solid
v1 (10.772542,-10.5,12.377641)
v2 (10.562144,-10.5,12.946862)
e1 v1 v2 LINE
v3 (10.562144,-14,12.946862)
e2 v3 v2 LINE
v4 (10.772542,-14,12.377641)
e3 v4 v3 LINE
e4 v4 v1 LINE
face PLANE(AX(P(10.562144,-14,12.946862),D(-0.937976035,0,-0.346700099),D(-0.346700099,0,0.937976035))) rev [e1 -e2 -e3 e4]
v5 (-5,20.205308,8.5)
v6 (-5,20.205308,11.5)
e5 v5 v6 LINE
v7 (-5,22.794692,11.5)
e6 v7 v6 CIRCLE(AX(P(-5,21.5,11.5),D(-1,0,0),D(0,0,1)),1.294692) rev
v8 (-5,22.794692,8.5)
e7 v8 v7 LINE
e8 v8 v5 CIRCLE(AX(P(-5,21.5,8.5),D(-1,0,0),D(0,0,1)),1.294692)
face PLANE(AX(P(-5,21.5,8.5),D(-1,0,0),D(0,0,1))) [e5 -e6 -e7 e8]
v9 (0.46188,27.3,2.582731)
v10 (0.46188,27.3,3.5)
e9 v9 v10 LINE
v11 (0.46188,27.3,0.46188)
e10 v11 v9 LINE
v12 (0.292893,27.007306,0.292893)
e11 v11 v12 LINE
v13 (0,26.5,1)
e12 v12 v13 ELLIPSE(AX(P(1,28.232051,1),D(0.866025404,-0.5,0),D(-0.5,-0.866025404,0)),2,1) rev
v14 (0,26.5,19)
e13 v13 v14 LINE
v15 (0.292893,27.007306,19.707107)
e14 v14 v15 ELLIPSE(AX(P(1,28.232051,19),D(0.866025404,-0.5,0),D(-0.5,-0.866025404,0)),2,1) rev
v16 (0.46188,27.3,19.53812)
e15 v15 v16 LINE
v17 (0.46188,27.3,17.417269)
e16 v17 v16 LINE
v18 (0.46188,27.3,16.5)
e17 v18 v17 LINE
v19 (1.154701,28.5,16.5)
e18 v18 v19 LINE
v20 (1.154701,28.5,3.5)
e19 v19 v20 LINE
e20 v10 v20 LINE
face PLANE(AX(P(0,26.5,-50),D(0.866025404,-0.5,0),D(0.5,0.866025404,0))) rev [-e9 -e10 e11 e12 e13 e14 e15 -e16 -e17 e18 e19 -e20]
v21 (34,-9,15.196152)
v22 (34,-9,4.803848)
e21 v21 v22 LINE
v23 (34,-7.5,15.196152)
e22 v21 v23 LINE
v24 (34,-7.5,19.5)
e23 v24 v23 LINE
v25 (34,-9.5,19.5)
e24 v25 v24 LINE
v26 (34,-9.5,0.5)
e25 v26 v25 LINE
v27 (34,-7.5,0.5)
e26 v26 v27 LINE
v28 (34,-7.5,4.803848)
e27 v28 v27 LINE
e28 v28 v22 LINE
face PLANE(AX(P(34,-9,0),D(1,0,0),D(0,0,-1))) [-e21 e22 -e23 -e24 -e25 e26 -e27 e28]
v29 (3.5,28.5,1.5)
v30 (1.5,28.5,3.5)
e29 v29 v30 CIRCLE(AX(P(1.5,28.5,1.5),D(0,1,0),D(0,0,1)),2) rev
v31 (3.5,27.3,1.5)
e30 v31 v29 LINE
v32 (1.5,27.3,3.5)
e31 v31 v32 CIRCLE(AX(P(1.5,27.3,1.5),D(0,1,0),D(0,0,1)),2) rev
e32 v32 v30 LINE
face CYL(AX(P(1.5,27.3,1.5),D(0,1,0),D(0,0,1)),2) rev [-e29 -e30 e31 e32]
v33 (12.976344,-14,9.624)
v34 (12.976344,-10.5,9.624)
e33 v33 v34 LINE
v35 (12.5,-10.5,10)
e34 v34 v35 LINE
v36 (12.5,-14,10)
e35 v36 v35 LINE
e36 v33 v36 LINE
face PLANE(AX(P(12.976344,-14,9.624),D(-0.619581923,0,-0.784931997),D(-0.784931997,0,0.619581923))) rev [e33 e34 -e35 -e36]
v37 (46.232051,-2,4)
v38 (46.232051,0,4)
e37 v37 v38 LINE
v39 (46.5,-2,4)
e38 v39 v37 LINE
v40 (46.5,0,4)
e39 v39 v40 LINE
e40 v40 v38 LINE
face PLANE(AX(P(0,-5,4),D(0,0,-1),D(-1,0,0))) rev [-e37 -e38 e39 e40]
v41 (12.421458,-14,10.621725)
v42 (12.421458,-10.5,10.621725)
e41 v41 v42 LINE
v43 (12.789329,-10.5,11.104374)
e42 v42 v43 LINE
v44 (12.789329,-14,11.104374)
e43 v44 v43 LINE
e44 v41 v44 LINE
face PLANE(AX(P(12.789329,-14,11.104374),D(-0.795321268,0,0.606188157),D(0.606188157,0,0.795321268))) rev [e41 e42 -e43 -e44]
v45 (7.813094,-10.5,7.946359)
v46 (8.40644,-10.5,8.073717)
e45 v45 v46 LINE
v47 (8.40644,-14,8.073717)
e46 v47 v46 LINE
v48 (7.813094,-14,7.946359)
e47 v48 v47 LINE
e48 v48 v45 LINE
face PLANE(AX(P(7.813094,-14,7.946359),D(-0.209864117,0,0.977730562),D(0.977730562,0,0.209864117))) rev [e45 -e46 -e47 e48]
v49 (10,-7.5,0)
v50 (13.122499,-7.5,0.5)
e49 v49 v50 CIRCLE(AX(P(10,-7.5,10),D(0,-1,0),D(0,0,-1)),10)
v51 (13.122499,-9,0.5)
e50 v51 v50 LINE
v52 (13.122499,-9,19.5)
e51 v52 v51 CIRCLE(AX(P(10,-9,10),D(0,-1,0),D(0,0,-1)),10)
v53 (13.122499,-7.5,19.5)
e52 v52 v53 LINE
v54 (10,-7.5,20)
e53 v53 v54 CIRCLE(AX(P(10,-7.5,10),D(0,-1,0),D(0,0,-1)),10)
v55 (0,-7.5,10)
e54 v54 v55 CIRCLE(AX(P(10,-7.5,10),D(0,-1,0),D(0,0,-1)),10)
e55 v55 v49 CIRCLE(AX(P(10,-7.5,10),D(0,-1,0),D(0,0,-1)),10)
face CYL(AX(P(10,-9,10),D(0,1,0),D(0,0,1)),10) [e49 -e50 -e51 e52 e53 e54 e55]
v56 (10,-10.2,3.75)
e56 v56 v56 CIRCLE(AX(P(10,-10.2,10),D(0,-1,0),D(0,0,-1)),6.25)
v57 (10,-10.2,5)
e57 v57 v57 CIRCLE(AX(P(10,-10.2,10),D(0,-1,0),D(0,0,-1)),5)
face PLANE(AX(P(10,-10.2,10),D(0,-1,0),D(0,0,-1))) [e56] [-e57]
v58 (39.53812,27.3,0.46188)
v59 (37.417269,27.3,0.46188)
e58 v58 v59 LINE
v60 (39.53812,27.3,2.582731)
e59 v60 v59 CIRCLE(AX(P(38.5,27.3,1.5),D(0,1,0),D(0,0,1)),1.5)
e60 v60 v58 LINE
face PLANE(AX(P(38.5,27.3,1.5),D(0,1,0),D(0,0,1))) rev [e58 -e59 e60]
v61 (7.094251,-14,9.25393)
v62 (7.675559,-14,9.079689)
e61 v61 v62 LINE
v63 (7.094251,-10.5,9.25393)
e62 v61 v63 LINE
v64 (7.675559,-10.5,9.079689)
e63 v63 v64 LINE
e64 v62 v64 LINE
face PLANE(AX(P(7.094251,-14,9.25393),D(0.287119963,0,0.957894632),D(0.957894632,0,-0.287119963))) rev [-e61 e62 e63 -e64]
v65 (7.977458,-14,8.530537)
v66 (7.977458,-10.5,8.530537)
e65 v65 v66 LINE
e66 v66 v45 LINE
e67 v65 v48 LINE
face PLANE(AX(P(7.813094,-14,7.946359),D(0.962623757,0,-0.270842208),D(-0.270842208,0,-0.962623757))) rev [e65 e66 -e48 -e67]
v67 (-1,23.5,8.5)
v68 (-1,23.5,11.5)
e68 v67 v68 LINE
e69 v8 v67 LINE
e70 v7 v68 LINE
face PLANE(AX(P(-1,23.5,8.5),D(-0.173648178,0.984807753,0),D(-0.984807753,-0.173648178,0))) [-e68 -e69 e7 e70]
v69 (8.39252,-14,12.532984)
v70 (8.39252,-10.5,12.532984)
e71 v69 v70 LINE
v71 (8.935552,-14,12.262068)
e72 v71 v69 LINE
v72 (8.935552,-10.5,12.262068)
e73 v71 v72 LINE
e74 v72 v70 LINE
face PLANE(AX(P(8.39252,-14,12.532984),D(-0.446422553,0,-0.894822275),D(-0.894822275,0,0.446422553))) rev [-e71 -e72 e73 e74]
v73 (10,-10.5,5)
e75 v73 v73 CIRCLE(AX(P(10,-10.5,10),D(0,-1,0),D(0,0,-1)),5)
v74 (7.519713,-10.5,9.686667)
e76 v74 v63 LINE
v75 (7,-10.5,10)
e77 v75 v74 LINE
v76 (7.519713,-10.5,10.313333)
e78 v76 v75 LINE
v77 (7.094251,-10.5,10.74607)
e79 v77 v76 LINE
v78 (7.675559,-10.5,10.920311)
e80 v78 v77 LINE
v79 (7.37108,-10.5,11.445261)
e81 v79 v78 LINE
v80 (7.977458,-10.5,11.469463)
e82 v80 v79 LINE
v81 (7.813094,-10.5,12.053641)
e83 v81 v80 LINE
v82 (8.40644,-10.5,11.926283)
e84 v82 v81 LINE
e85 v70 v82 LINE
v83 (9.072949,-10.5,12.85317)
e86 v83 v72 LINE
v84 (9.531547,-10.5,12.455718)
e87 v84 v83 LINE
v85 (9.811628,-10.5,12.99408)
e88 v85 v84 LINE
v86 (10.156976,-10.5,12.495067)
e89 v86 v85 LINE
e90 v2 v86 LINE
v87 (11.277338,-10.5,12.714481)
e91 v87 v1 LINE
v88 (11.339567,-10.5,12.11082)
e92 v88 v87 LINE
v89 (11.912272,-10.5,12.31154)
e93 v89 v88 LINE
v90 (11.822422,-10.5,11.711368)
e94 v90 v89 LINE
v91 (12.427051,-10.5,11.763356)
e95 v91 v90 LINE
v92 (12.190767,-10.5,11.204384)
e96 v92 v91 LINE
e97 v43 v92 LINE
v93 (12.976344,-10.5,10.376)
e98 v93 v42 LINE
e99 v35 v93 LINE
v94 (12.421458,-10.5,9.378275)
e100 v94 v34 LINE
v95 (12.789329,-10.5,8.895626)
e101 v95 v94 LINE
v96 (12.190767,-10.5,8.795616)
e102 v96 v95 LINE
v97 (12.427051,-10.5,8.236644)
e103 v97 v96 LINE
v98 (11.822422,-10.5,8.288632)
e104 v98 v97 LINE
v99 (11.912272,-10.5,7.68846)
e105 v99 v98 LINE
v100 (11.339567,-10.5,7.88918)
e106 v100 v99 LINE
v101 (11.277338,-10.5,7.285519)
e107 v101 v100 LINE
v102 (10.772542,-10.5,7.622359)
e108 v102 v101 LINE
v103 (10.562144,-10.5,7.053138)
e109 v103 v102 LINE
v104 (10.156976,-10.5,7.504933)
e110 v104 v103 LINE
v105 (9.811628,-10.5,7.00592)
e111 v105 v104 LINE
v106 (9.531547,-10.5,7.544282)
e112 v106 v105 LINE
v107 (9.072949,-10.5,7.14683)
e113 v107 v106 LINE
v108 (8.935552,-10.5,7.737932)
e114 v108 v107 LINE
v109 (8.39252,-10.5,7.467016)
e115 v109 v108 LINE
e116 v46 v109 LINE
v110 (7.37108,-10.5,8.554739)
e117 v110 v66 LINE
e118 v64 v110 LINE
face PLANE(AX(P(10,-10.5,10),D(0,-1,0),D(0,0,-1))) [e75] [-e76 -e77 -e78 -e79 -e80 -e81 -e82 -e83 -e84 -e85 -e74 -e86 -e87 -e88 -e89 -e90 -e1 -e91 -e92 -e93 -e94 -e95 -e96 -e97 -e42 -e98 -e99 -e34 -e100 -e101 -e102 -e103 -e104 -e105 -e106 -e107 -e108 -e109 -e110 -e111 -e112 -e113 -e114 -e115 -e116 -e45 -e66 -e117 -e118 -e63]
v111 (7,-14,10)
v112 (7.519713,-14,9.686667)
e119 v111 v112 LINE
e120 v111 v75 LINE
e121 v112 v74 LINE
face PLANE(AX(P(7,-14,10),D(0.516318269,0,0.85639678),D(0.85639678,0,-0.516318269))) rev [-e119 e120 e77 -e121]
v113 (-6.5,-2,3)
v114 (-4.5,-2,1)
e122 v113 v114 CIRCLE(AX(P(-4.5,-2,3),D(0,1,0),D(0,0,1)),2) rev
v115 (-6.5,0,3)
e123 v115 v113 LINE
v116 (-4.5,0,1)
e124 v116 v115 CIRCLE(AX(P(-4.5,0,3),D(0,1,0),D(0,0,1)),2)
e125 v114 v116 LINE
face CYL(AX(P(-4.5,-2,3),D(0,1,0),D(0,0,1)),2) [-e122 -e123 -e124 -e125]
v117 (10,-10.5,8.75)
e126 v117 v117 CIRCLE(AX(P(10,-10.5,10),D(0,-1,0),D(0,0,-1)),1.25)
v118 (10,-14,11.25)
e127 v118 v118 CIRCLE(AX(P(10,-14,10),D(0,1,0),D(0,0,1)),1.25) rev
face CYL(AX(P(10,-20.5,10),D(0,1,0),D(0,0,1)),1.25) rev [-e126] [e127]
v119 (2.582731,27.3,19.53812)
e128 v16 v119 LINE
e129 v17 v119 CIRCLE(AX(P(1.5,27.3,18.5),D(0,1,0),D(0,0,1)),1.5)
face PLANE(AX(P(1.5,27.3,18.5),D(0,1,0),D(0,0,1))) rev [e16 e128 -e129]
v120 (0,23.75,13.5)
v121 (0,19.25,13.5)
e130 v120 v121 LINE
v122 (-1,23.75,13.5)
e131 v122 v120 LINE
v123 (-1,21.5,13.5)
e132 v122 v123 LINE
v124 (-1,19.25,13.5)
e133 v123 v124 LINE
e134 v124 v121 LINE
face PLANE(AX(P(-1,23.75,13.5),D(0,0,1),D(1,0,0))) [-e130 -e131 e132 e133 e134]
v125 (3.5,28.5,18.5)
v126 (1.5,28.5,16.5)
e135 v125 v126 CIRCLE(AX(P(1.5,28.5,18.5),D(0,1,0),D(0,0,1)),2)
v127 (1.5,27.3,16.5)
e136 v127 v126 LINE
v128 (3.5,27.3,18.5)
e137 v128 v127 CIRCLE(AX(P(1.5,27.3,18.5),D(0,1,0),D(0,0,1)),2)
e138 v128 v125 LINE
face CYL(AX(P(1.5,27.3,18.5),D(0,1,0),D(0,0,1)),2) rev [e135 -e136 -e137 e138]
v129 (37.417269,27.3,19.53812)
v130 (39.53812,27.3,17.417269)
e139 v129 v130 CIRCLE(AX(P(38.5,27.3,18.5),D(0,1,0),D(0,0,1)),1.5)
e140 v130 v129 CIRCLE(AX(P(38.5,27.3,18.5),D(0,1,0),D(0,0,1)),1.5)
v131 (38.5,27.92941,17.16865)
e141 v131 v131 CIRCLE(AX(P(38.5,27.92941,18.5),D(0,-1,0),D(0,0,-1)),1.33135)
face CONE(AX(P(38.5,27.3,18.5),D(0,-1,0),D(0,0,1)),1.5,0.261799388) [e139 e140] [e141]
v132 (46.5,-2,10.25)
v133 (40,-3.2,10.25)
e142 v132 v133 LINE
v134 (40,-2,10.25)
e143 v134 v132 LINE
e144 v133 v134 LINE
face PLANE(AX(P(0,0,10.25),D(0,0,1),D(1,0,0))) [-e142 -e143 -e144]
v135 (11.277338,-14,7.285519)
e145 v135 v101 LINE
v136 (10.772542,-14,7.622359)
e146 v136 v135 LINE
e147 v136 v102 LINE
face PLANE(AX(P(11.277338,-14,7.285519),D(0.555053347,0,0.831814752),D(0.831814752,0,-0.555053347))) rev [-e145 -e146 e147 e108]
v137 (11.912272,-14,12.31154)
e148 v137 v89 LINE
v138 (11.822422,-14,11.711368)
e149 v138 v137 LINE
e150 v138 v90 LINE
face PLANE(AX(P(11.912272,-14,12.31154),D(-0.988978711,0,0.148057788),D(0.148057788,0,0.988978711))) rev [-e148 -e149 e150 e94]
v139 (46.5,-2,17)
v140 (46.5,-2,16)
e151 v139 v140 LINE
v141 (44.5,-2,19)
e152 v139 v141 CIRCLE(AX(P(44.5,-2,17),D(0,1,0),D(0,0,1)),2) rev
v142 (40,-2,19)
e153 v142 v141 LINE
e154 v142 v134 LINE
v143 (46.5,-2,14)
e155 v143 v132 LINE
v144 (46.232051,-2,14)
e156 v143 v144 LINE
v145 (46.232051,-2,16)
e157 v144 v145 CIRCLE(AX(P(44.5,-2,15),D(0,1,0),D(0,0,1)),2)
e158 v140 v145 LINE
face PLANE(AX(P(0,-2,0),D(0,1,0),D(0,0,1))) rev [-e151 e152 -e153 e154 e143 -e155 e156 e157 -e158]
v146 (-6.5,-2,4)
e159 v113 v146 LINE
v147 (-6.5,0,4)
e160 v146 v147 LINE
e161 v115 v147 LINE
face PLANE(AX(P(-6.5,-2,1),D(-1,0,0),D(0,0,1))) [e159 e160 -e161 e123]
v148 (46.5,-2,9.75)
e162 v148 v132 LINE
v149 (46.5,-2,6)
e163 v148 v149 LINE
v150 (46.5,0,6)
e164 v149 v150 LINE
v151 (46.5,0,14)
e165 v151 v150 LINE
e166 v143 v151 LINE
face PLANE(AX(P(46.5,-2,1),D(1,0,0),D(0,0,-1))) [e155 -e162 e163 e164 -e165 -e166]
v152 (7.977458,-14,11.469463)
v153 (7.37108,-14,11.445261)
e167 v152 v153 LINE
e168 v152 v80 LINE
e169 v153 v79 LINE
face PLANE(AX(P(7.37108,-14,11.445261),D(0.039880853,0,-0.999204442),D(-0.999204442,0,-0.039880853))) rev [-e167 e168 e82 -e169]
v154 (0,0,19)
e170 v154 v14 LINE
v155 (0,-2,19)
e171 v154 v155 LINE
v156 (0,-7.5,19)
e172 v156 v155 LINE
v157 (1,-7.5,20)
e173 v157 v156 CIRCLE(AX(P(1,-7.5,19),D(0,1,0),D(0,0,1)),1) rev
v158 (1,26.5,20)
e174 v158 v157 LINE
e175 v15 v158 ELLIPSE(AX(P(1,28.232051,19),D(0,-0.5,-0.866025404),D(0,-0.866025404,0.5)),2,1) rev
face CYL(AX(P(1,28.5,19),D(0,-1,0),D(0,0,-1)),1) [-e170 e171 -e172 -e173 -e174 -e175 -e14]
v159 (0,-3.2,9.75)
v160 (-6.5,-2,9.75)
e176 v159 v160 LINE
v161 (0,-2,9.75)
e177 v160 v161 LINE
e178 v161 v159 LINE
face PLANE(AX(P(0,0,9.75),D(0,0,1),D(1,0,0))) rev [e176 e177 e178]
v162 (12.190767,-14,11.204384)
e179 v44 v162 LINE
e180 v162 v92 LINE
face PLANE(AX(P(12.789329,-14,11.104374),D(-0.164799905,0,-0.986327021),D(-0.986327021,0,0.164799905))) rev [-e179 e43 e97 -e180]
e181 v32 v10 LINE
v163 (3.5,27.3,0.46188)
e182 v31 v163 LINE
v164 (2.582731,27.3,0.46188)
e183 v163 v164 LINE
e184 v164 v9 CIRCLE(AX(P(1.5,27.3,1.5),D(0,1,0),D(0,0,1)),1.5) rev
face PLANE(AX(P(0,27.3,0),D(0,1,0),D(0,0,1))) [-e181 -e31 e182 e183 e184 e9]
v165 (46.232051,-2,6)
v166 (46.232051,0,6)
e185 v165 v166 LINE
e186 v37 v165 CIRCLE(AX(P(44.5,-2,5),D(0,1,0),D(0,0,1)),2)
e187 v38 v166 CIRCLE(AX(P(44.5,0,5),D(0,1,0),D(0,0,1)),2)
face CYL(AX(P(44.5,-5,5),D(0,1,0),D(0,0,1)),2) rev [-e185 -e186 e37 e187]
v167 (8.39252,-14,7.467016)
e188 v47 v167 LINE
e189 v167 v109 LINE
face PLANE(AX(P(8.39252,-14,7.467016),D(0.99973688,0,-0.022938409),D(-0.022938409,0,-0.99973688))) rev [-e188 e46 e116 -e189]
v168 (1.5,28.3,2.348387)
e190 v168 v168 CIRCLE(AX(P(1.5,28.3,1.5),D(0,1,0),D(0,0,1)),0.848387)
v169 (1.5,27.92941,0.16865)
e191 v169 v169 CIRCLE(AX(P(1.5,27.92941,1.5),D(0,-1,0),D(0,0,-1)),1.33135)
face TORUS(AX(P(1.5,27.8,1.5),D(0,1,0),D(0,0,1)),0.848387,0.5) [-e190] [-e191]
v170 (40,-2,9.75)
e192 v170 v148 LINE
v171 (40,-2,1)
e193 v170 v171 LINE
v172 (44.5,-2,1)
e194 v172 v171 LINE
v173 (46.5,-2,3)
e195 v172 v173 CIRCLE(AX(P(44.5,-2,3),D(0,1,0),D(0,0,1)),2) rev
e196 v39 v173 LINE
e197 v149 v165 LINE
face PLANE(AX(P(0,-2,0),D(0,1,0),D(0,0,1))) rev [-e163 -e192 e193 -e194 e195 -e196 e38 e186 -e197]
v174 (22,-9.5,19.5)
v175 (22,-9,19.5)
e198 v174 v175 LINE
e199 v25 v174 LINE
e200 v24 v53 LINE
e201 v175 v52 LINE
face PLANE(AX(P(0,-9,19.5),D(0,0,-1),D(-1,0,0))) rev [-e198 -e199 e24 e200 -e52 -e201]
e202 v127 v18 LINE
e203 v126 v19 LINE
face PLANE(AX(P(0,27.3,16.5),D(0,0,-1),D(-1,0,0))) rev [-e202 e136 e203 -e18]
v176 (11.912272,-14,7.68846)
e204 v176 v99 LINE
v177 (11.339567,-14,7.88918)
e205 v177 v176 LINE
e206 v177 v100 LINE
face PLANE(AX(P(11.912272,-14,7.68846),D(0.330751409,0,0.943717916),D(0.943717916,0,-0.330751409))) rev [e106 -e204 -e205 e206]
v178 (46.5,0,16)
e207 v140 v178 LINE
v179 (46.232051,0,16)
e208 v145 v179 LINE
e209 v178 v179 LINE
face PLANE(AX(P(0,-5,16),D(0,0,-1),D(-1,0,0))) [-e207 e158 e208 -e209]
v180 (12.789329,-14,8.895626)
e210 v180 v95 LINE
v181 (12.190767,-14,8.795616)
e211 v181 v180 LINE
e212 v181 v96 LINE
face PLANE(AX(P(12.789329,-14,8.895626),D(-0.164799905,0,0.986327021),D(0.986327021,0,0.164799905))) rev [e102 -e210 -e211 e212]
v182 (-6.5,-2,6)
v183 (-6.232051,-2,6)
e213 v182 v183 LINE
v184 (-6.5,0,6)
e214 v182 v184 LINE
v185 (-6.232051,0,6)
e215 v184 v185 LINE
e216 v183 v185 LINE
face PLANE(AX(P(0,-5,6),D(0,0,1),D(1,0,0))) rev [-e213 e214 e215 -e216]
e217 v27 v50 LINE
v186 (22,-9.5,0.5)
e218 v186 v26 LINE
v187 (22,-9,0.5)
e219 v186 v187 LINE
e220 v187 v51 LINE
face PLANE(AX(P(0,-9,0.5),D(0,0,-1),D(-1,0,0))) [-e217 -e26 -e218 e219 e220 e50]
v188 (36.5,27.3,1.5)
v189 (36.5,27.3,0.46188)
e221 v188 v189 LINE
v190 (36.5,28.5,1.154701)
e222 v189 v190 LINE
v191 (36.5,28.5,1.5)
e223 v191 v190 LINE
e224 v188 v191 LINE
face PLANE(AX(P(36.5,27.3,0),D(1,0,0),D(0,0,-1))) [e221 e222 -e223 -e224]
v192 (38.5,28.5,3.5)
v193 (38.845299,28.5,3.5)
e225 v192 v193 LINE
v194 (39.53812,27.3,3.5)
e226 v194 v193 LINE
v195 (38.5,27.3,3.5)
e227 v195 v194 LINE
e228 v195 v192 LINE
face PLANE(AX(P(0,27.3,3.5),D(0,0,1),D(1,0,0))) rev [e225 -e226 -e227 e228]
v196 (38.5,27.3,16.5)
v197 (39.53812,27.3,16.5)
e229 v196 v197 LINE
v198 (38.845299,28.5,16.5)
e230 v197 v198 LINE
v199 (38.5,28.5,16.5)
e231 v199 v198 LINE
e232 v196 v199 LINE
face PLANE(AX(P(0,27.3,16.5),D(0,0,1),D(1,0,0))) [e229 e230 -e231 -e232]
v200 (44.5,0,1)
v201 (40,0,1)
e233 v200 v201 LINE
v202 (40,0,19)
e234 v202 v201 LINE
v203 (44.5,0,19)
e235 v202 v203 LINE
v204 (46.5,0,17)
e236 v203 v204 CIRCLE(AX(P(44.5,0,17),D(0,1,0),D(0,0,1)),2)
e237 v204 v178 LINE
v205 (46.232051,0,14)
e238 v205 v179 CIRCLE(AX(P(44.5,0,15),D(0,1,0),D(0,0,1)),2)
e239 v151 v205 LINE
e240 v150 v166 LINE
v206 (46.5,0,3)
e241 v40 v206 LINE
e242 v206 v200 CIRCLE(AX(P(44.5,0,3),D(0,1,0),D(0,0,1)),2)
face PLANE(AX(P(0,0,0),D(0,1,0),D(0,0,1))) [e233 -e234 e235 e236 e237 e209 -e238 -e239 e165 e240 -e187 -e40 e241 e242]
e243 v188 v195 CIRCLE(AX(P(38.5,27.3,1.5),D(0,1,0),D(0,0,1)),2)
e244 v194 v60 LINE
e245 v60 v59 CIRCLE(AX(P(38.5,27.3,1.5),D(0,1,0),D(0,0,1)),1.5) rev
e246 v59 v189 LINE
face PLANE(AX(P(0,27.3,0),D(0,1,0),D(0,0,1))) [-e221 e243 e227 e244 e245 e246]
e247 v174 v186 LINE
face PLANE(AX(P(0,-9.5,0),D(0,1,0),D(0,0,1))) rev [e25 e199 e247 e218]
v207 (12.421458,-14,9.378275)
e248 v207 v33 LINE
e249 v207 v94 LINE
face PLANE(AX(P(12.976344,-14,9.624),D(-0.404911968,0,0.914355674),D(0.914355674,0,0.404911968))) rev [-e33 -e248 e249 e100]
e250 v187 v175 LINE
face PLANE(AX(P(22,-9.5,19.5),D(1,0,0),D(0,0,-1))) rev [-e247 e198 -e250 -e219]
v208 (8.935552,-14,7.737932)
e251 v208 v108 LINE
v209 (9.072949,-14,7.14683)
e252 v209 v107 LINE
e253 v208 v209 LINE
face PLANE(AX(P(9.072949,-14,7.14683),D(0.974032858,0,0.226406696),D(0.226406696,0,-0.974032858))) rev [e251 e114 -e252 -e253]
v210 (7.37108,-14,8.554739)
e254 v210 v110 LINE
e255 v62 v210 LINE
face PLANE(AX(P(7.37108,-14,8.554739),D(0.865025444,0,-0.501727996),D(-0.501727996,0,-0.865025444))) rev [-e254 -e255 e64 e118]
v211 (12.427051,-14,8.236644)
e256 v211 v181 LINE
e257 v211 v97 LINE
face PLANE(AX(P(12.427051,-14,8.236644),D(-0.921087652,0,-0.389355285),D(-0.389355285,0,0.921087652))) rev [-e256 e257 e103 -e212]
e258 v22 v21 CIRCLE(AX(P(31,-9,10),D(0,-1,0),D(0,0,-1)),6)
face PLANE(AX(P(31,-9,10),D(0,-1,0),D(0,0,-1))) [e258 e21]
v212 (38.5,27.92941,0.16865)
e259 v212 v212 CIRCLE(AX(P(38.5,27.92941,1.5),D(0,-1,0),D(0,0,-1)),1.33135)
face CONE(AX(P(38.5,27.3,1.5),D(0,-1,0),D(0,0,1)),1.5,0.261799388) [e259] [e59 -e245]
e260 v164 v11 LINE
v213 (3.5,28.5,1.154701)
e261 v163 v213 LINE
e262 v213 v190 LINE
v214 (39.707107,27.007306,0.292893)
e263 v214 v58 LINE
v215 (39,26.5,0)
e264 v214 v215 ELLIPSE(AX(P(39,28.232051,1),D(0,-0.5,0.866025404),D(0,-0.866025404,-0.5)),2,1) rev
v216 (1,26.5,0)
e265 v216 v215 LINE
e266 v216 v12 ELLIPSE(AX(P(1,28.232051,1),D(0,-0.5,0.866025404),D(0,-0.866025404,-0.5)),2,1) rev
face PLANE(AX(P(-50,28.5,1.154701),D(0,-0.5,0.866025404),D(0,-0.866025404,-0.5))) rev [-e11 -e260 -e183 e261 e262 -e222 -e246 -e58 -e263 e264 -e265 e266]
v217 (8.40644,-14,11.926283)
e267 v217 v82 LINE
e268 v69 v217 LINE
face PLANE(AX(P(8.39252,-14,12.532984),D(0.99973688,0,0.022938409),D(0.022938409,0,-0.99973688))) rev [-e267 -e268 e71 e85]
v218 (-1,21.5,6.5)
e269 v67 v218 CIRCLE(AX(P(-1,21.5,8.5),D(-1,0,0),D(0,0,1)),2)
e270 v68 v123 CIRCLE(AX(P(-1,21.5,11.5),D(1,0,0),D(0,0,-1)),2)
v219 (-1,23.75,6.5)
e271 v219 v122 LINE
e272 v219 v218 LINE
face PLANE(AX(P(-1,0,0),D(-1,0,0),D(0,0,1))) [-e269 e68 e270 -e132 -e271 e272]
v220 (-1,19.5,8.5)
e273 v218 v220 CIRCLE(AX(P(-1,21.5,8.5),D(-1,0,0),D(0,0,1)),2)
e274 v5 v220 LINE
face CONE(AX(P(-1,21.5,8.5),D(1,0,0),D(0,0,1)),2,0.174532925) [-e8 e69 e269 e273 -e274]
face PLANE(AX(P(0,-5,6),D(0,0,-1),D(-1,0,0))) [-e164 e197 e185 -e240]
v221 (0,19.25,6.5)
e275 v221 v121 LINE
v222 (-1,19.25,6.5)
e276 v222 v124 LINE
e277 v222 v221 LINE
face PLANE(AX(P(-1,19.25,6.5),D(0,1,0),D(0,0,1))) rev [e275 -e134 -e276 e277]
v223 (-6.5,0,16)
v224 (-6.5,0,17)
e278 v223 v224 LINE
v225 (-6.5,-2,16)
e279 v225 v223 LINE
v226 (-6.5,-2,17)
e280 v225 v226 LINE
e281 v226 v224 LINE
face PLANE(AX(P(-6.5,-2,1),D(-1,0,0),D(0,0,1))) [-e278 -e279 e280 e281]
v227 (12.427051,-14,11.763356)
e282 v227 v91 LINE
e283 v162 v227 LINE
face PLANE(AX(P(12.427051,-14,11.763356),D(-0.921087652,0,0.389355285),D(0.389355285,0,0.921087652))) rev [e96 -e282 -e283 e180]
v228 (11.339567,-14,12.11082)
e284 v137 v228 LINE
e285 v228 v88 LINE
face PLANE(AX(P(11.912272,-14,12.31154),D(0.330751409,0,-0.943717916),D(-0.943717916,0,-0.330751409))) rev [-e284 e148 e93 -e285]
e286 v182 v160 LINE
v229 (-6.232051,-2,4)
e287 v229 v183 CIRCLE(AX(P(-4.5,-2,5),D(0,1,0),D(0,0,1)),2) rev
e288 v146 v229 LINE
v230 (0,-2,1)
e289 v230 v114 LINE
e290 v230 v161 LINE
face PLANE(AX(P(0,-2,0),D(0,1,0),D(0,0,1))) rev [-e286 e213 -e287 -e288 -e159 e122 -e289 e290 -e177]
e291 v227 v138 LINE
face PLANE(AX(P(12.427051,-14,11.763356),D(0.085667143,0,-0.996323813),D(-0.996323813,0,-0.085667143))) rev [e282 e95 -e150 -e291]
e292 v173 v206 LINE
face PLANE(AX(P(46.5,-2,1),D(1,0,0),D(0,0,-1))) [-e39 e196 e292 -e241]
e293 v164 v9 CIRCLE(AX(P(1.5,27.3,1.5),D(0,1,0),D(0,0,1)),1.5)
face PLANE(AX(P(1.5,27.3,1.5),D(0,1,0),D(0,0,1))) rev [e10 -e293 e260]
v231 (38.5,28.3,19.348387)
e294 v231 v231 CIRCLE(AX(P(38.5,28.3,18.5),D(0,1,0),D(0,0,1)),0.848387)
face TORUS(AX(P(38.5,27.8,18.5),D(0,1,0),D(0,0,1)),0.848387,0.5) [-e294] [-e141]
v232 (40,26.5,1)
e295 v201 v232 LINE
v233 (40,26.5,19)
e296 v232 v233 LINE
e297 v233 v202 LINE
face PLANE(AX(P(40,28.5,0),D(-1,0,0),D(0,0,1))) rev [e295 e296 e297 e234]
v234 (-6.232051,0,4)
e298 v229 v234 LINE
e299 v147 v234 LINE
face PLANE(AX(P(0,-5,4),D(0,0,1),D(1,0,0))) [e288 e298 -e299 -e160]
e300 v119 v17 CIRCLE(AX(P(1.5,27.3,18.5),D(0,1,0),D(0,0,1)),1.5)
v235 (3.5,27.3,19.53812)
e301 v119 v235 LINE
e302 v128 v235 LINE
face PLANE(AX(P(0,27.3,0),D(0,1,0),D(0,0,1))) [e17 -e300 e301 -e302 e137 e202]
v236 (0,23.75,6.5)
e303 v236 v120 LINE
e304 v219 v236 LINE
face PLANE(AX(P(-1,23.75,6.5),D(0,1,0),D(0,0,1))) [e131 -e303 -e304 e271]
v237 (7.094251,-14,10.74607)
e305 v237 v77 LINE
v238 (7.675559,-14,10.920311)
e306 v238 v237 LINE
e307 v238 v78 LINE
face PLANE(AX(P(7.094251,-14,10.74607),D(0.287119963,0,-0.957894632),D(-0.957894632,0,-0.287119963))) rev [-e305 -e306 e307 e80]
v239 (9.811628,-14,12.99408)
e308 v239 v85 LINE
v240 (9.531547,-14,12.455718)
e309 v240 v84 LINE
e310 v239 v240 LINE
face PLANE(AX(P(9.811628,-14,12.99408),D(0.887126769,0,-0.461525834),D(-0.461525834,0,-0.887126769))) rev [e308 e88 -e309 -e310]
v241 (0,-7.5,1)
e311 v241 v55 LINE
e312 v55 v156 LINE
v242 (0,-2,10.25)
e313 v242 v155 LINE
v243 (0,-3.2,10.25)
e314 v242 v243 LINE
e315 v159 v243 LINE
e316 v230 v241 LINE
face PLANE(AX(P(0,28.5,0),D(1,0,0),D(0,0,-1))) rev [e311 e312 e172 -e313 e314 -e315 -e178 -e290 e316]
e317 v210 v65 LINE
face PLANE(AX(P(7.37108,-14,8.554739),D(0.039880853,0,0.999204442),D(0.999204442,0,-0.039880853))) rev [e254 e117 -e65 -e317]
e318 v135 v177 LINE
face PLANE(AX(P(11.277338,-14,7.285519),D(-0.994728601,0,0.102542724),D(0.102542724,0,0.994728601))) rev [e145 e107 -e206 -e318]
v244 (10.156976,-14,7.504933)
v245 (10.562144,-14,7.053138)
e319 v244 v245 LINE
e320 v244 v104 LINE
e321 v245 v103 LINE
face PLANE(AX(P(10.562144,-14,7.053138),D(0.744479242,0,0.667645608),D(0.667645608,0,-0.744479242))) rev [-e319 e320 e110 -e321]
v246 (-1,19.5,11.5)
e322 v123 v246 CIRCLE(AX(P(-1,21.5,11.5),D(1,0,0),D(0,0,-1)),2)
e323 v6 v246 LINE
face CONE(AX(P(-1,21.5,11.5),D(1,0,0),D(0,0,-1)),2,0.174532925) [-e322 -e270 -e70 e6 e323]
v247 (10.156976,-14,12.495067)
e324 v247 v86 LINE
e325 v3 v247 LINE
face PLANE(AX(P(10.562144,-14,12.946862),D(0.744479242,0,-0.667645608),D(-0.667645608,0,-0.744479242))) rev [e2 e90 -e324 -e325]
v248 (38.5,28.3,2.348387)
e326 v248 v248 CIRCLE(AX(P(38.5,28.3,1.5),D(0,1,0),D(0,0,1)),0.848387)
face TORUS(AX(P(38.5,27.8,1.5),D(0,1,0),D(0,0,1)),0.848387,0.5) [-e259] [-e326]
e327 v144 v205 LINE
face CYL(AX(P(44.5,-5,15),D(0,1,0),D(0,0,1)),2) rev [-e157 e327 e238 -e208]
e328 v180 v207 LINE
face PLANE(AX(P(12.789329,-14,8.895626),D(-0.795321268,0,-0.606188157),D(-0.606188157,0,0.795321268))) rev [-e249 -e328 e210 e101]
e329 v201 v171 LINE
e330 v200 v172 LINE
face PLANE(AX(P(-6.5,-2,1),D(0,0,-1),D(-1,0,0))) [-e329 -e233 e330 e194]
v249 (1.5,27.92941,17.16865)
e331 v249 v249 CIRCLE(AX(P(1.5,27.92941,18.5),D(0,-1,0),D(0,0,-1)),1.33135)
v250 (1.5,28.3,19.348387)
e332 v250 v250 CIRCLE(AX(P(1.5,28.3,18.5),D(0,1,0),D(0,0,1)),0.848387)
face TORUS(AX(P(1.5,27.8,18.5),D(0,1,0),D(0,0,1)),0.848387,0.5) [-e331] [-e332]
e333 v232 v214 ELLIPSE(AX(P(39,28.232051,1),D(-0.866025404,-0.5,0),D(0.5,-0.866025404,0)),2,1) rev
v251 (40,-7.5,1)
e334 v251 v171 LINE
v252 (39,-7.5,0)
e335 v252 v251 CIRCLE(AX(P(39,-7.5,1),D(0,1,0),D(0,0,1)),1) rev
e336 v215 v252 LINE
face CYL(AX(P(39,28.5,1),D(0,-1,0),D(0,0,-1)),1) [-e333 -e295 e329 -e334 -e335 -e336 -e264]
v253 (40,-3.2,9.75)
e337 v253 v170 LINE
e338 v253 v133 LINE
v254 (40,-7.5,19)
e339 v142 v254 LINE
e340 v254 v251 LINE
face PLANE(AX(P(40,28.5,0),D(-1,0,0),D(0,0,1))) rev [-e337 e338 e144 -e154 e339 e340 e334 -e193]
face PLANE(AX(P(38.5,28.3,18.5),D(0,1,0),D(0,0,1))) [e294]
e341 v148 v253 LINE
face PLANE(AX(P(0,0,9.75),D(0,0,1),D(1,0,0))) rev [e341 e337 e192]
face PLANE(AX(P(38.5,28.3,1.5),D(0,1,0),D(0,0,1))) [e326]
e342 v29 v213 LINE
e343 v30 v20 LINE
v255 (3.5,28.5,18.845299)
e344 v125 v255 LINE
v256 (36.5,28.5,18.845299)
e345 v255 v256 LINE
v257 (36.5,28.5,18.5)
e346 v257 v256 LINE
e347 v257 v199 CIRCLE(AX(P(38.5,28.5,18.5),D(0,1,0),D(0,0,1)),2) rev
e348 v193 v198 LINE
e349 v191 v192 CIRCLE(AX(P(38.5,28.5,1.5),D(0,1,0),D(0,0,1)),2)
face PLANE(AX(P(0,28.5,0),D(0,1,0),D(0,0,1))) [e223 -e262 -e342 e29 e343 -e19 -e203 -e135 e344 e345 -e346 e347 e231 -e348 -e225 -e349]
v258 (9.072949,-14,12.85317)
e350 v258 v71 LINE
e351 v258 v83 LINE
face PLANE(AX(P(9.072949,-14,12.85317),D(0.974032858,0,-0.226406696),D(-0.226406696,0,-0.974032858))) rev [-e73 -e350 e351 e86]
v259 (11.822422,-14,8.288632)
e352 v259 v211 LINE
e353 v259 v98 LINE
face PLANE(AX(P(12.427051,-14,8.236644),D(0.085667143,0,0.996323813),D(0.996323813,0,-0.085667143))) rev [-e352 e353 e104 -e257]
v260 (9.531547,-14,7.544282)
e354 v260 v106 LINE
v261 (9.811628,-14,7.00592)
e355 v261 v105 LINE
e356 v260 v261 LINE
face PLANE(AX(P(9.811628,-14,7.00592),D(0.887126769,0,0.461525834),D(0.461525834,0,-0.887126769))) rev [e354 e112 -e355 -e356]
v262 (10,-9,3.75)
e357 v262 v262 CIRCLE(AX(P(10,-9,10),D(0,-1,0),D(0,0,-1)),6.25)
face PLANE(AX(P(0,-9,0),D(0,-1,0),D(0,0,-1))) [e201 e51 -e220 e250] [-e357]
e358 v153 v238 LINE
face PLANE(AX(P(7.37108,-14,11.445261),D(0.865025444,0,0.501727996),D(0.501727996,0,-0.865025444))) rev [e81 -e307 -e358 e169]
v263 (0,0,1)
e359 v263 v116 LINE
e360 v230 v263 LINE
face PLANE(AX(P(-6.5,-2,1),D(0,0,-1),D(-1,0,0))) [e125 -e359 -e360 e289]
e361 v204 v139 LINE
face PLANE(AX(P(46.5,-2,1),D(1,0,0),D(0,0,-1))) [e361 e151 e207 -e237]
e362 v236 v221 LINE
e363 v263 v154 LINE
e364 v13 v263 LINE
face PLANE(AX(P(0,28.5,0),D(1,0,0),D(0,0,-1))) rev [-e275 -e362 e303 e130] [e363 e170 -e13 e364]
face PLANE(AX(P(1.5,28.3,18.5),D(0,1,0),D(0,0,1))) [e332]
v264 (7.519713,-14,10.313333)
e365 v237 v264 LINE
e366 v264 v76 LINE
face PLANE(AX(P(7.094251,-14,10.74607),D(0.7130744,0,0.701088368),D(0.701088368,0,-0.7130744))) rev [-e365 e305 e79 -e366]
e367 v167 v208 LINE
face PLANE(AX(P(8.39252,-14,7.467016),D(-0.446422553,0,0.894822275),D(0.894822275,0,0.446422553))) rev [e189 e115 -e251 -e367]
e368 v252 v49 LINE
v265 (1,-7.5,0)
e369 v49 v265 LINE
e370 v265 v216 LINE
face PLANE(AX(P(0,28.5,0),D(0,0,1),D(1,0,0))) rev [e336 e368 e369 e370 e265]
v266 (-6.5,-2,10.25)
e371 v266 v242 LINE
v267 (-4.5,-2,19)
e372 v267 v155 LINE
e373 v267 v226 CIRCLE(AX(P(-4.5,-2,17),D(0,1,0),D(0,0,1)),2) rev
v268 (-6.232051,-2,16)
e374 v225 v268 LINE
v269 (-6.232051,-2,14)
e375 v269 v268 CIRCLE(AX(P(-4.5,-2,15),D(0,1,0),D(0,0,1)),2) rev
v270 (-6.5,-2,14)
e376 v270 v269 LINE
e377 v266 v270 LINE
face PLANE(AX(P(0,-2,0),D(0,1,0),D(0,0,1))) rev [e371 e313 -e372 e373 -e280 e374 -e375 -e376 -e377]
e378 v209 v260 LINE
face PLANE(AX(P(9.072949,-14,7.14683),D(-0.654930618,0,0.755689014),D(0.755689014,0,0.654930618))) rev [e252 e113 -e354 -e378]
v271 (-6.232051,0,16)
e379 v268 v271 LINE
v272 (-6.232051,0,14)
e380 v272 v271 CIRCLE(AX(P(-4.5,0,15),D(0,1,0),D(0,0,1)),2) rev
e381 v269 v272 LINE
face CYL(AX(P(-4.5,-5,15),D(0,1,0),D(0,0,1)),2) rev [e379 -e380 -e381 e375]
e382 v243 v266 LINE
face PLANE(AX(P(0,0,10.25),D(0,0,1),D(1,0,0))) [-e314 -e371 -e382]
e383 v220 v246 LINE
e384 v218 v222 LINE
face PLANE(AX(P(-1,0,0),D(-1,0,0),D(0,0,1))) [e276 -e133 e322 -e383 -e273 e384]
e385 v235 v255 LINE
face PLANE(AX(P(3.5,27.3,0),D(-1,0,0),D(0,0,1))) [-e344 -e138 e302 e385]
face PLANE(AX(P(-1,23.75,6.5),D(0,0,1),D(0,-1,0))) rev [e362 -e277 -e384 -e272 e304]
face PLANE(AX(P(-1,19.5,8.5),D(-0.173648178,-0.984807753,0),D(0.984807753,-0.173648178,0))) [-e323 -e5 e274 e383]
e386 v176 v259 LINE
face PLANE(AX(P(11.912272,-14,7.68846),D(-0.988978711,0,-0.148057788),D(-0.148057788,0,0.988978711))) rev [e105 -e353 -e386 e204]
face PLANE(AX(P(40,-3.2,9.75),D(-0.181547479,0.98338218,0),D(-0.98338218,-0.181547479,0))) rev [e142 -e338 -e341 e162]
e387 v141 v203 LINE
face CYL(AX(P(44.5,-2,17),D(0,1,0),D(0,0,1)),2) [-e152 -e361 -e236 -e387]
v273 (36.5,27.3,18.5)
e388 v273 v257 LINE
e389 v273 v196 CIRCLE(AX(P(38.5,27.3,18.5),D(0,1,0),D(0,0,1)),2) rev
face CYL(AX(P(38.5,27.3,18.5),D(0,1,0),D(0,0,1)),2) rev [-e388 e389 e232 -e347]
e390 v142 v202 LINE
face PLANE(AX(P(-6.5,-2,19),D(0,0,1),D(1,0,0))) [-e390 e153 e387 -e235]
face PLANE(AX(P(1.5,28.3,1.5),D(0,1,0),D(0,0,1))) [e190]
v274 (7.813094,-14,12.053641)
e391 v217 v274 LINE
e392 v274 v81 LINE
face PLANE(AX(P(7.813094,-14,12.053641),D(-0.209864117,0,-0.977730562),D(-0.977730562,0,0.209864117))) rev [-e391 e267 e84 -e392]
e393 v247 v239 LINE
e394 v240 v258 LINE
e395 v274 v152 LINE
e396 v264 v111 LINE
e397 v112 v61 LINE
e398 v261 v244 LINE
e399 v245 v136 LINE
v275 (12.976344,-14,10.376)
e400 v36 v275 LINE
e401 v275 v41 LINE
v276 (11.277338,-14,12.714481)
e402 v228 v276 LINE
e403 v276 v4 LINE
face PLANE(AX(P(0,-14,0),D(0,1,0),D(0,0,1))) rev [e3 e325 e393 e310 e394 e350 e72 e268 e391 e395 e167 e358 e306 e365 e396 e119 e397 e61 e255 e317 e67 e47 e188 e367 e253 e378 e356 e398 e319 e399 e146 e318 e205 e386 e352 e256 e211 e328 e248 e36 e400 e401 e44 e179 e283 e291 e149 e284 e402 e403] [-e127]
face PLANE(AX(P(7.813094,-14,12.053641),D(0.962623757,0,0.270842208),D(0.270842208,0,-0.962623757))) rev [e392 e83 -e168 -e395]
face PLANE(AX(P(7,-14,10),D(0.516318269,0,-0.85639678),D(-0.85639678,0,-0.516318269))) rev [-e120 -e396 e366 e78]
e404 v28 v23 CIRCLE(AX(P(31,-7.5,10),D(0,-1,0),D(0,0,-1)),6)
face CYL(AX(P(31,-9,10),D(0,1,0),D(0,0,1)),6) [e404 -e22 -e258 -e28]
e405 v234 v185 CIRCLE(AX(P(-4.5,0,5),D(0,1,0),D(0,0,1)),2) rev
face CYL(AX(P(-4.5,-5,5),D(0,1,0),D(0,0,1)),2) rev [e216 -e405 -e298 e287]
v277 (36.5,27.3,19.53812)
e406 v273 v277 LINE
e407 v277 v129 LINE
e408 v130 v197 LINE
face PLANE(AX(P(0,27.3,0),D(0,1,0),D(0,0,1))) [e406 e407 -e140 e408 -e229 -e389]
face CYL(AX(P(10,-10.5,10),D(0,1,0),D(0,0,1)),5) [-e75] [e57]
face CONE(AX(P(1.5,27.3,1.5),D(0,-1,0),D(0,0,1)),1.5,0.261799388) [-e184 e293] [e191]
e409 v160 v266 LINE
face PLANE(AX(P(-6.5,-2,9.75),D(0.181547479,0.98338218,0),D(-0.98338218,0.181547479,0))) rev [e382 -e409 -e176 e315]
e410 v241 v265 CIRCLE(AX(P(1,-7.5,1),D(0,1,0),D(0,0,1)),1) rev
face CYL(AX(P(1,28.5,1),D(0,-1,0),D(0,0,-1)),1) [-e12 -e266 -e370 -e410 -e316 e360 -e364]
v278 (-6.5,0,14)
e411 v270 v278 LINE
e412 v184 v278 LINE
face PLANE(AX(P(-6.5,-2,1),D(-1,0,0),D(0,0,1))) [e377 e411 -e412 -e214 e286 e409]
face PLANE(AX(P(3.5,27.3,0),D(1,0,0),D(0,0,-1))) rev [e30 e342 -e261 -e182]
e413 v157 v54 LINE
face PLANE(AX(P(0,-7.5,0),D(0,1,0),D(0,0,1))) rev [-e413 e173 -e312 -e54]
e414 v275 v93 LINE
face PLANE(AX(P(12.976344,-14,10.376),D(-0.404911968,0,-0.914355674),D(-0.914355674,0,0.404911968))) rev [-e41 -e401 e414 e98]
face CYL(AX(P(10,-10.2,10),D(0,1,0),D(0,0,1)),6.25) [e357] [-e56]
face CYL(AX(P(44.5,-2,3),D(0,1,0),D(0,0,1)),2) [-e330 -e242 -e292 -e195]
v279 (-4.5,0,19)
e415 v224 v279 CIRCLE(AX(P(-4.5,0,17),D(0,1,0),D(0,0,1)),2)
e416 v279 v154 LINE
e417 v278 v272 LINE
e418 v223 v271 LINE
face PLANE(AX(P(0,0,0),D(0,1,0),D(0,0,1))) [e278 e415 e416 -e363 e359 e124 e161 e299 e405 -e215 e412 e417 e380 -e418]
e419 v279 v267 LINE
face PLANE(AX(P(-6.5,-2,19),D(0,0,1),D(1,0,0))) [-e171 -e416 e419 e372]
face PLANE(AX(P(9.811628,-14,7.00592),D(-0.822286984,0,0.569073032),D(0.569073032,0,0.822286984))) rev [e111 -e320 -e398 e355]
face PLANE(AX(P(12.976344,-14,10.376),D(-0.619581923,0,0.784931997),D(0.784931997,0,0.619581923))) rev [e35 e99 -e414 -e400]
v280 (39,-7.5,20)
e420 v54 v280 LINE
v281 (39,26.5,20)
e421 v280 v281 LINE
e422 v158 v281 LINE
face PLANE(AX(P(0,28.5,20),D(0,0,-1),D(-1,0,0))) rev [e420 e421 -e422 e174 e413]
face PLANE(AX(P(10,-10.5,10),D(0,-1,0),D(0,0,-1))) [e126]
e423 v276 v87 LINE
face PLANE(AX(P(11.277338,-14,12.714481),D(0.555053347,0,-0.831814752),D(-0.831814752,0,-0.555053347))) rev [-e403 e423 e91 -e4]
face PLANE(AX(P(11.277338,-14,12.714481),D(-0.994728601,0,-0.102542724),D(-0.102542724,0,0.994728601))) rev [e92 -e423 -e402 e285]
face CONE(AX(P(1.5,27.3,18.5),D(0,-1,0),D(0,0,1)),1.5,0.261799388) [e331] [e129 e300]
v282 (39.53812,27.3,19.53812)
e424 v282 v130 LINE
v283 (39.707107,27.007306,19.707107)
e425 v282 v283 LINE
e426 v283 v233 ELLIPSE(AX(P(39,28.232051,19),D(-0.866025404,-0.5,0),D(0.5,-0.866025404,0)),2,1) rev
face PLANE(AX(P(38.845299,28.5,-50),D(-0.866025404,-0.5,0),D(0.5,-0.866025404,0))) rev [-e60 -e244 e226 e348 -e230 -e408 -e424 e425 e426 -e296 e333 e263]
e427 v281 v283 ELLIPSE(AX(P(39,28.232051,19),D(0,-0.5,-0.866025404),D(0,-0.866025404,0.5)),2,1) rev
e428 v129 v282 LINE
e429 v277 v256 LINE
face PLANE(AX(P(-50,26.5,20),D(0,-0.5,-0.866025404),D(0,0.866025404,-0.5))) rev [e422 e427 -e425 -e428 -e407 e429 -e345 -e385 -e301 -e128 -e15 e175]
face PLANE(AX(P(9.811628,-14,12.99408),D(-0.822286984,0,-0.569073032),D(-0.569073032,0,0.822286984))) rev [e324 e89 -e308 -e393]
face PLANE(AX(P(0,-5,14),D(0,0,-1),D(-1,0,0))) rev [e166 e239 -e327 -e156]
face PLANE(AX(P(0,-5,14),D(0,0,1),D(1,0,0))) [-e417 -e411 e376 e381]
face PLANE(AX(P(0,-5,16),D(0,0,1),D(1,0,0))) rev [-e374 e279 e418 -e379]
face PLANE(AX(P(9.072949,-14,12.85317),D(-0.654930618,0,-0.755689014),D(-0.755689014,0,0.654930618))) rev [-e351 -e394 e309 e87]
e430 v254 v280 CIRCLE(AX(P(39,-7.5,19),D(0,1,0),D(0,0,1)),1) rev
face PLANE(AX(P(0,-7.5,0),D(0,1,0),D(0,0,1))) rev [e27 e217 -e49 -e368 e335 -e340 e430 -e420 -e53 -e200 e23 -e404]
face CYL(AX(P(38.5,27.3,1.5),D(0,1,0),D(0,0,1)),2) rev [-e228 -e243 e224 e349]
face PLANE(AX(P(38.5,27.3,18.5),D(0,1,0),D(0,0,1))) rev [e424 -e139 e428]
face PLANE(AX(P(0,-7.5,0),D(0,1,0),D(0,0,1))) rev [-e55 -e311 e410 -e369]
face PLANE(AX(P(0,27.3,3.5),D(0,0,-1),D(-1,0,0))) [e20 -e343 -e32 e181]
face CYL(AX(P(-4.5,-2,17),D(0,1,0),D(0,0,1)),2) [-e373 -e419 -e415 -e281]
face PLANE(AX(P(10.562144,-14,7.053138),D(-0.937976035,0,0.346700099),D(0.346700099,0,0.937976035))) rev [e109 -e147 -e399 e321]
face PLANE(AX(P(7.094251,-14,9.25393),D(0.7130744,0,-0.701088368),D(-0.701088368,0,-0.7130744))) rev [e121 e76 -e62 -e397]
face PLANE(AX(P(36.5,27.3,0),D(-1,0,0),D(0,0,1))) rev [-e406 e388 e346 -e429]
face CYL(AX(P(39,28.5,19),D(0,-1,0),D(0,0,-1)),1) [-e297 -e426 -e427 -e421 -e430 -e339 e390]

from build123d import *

# Parameters (mm, degrees)
SKETCH_1_W                 = 40
SKETCH_1_H                 = 20
EXTRUDE_1_DEPTH            = 28.5
SKETCH_7_R                 = 2.5
EXTRUDE_4_DEPTH            = 6.975384219
SKETCH_1_2_W               = 40
SKETCH_1_2_H               = 20
EXTRUDE_5_DEPTH            = 7.5
SKETCH_3_W                 = 53
SKETCH_3_H                 = 18
EXTRUDE_6_DEPTH            = 2
CUT_EXTRUDE_4_DEPTH        = 5
EXTRUDE_7_DEPTH            = 1.5
SKETCH_13_W                = 12
SKETCH_13_H                = 19
EXTRUDE_8_DEPTH            = 2
SKETCH_14_R                = 6
EXTRUDE_9_DEPTH            = 1.5
EXTRUDE_10_DEPTH           = 0.25
CUT_EXTRUDE_5_DEPTH        = 50
CUT_EXTRUDE_6_DEPTH        = 50
CUT_EXTRUDE_11_DEPTH       = 1.2
SKETCH_25_R                = 1.5
EXTRUDE_12_DEPTH           = 1
EXTRUDE_12_DRAFT           = 15
EXTRUDE_12_PROFILE_2_DEPTH = 1
EXTRUDE_12_PROFILE_2_DRAFT = 15
EXTRUDE_12_PROFILE_3_DEPTH = 1
EXTRUDE_12_PROFILE_3_DRAFT = 15
EXTRUDE_12_PROFILE_4_DEPTH = 1
EXTRUDE_12_PROFILE_4_DRAFT = 15
SKETCH_29_R                = 6.25
EXTRUDE_15_DEPTH           = 1.2
SKETCH_30_R                = 5
EXTRUDE_16_DEPTH           = 0.3
EXTRUDE_17_DEPTH           = 3.5
SKETCH_33_R                = 1.25
CUT_EXTRUDE_12_DEPTH       = 10
FILLET_1_R                 = 2
FILLET_2_R                 = 1
FILLET_4_R                 = 0.5
SKETCH_34_W                = 7
SKETCH_34_H                = 4.5
EXTRUDE_18_DEPTH           = 1
EXTRUDE_19_DEPTH           = 4
EXTRUDE_19_TAPER           = 10


with BuildPart() as part:
    # 草图1 → 凸台-拉伸1 (new body)
    with BuildSketch(Plane(origin=(0, 0, 0), x_dir=(1, 0, 0), z_dir=(0, 1, 0))):
        with Locations((20, -10)):
            Rectangle(SKETCH_1_W, SKETCH_1_H)
    extrude(amount=EXTRUDE_1_DEPTH)

    # 草图7 → 凸台-拉伸4 (add)
    with BuildSketch(Plane(origin=(0, 0, 0), x_dir=(1, 0, 0), z_dir=(0, 1, 0))):
        with Locations(Location((10, -10, 0), (0, 0, 270))):
            Circle(SKETCH_7_R)
    extrude(amount=-EXTRUDE_4_DEPTH)

    # 草图1<2> → 凸台-拉伸5 (add)
    with BuildSketch(Plane(origin=(0, 0, 0), x_dir=(1, 0, 0), z_dir=(0, 1, 0))):
        with Locations((20, -10)):
            Rectangle(SKETCH_1_2_W, SKETCH_1_2_H)
    extrude(amount=-EXTRUDE_5_DEPTH)

    # 草图3 → 凸台-拉伸6 (add)
    with BuildSketch(Plane(origin=(0, 0, 0), x_dir=(1, 0, 0), z_dir=(0, 1, 0))):
        with Locations((20, -10)):
            Rectangle(SKETCH_3_W, SKETCH_3_H)
    extrude(amount=-EXTRUDE_6_DEPTH)

    # 草图8 → 切除-拉伸4 (cut, symmetric)
    with BuildSketch(Plane(origin=(0, 0, 0), x_dir=(1, 0, 0), z_dir=(0, 1, 0))):
        with BuildLine():
            Line((-9.5, -4), (-9.5, -6))
            Line((-9.5, -6), (-6.232050808, -6))
            ThreePointArc((-6.232050808, -6), (-2.5, -5), (-6.232050808, -4))
            Line((-6.232050808, -4), (-9.5, -4))
        make_face()
        with BuildLine():
            Line((-6.232050808, -14), (-9.5, -14))
            Line((-9.5, -14), (-9.5, -16))
            Line((-9.5, -16), (-6.232050808, -16))
            ThreePointArc((-6.232050808, -16), (-2.5, -15), (-6.232050808, -14))
        make_face()
        with BuildLine():
            Line((49.5, -6), (49.5, -4))
            Line((49.5, -4), (46.232050808, -4))
            ThreePointArc((46.232050808, -4), (42.5, -5), (46.232050808, -6))
            Line((46.232050808, -6), (49.5, -6))
        make_face()
        with BuildLine():
            Line((49.5, -16), (49.5, -14))
            Line((49.5, -14), (46.232050808, -14))
            ThreePointArc((46.232050808, -14), (42.5, -15), (46.232050808, -16))
            Line((46.232050808, -16), (49.5, -16))
        make_face()
    extrude(amount=CUT_EXTRUDE_4_DEPTH, both=True, mode=Mode.SUBTRACT)

    # 草图9 → 凸台-拉伸7 (add)
    with BuildSketch(Plane.XZ.offset(7.5)):
        with BuildLine():
            Line((34, 19.5), (34, 0.5))
            Line((34, 0.5), (13.122498999, 0.5))
            ThreePointArc((13.122498999, 0.5), (0, 10), (13.122498999, 19.5))
            Line((13.122498999, 19.5), (34, 19.5))
        make_face()
    extrude(amount=EXTRUDE_7_DEPTH)

    # 草图13 → 凸台-拉伸8 (add)
    with BuildSketch(Plane.XZ.offset(7.5)):
        with Locations((28, 10)):
            Rectangle(SKETCH_13_W, SKETCH_13_H)
    extrude(amount=EXTRUDE_8_DEPTH)

    # 草图14 → 凸台-拉伸9 (add)
    with BuildSketch(Plane.XZ.offset(7.5)):
        with Locations((31, 10)):
            Circle(SKETCH_14_R)
    extrude(amount=EXTRUDE_9_DEPTH)

    # 草图15 → 凸台-拉伸10 (add, symmetric)
    with BuildSketch(Plane(origin=(0, 0, 10), x_dir=(-1, 0, 0), z_dir=(0, 0, -1))):
        Polygon((0, -3.2), (-40, -3.2), (-46.5, -2), (6.5, -2), align=None)
    extrude(amount=EXTRUDE_10_DEPTH, both=True)

    # 草图16 → 切除-拉伸5 (cut, symmetric)
    with BuildSketch(Plane.XY):
        Polygon((0, 26.5), (1.154700538, 28.5), (38.845299462, 28.5), (40, 26.5), (45, 26.5), (45, 36.5), (-5, 36.5), (-5, 26.5), align=None)
    extrude(amount=CUT_EXTRUDE_5_DEPTH, both=True, mode=Mode.SUBTRACT)

    # 草图18 → 切除-拉伸6 (cut, symmetric)
    with BuildSketch(Plane(origin=(0, 0, 0), x_dir=(0, 0, -1), z_dir=(1, 0, 0))):
        Polygon((-20, 26.5), (-18.845299462, 28.5), (-1.154700538, 28.5), (0, 26.5), (15, 26.5), (15, 36.5), (-35, 36.5), (-35, 26.5), align=None)
    extrude(amount=CUT_EXTRUDE_6_DEPTH, both=True, mode=Mode.SUBTRACT)

    # 草图22 → 切除-拉伸11 (cut)
    with BuildSketch(Plane(origin=(0, 28.5, 0), x_dir=(1, 0, 0), z_dir=(0, 1, 0))):
        with BuildLine():
            ThreePointArc((1.5, -3.5), (2.914213562, -2.914213562), (3.5, -1.5))
            Line((3.5, -1.5), (3.5, 0.5))
            Line((3.5, 0.5), (-0.5, 0.5))
            Line((-0.5, 0.5), (-0.5, -3.5))
            Line((-0.5, -3.5), (1.5, -3.5))
        make_face()
        with BuildLine():
            Line((3.5, -20.5), (3.5, -18.5))
            ThreePointArc((3.5, -18.5), (2.914213562, -17.085786438), (1.5, -16.5))
            Line((1.5, -16.5), (-0.5, -16.5))
            Line((-0.5, -16.5), (-0.5, -20.5))
            Line((-0.5, -20.5), (3.5, -20.5))
        make_face()
        with BuildLine():
            ThreePointArc((38.5, -16.5), (37.085786438, -17.085786438), (36.5, -18.5))
            Line((36.5, -18.5), (36.5, -20.5))
            Line((36.5, -20.5), (40.5, -20.5))
            Line((40.5, -20.5), (40.5, -16.5))
            Line((40.5, -16.5), (38.5, -16.5))
        make_face()
        with BuildLine():
            Line((36.5, 0.5), (36.5, -1.5))
            ThreePointArc((36.5, -1.5), (37.085786438, -2.914213562), (38.5, -3.5))
            Line((38.5, -3.5), (40.5, -3.5))
            Line((40.5, -3.5), (40.5, 0.5))
            Line((40.5, 0.5), (36.5, 0.5))
        make_face()
    extrude(amount=-CUT_EXTRUDE_11_DEPTH, mode=Mode.SUBTRACT)


with BuildPart() as extrude_12_tool:
    # 草图25 → 凸台-拉伸12 (with draft: the straight prism first)
    with BuildSketch(Plane(origin=(0, 27.3, 0), x_dir=(1, 0, 0), z_dir=(0, 1, 0))):
        with Locations((1.5, -1.5)):
            Circle(SKETCH_25_R)
    extrude(amount=EXTRUDE_12_DEPTH)
    # 凸台-拉伸12: the draft: its side faces are tilted about the plane it starts from
    extrude_12_sides = [extrude_12_tool.faces().sort_by_distance(p)[0] for p in [
        (0, 27.8, 1.5),
    ]]
    draft(extrude_12_sides, Plane(origin=(0, 27.3, 0), x_dir=(1, 0, 0), z_dir=(0, 1, 0)), EXTRUDE_12_DRAFT)


with BuildPart() as part_1:
    add(part.part)

    # 凸台-拉伸12: add extrude_12_tool
    add(extrude_12_tool.part)


with BuildPart() as extrude_12_profile_2_tool:
    # 草图25 → 凸台-拉伸12 profile 2 (with draft: the straight prism first)
    with BuildSketch(Plane(origin=(0, 27.3, 0), x_dir=(1, 0, 0), z_dir=(0, 1, 0))):
        with Locations((38.5, -1.5)):
            Circle(SKETCH_25_R)
    extrude(amount=EXTRUDE_12_PROFILE_2_DEPTH)
    # 凸台-拉伸12 profile 2: the draft: its side faces are tilted about the plane it starts from
    extrude_12_profile_2_sides = [extrude_12_profile_2_tool.faces().sort_by_distance(p)[0] for p in [
        (37, 27.8, 1.5),
    ]]
    draft(extrude_12_profile_2_sides, Plane(origin=(0, 27.3, 0), x_dir=(1, 0, 0), z_dir=(0, 1, 0)), EXTRUDE_12_PROFILE_2_DRAFT)


with BuildPart() as part_2:
    add(part_1.part)

    # 凸台-拉伸12 profile 2: add extrude_12_profile_2_tool
    add(extrude_12_profile_2_tool.part)


with BuildPart() as extrude_12_profile_3_tool:
    # 草图25 → 凸台-拉伸12 profile 3 (with draft: the straight prism first)
    with BuildSketch(Plane(origin=(0, 27.3, 0), x_dir=(1, 0, 0), z_dir=(0, 1, 0))):
        with Locations((38.5, -18.5)):
            Circle(SKETCH_25_R)
    extrude(amount=EXTRUDE_12_PROFILE_3_DEPTH)
    # 凸台-拉伸12 profile 3: the draft: its side faces are tilted about the plane it starts from
    extrude_12_profile_3_sides = [extrude_12_profile_3_tool.faces().sort_by_distance(p)[0] for p in [
        (37, 27.8, 18.5),
    ]]
    draft(extrude_12_profile_3_sides, Plane(origin=(0, 27.3, 0), x_dir=(1, 0, 0), z_dir=(0, 1, 0)), EXTRUDE_12_PROFILE_3_DRAFT)


with BuildPart() as part_3:
    add(part_2.part)

    # 凸台-拉伸12 profile 3: add extrude_12_profile_3_tool
    add(extrude_12_profile_3_tool.part)


with BuildPart() as extrude_12_profile_4_tool:
    # 草图25 → 凸台-拉伸12 profile 4 (with draft: the straight prism first)
    with BuildSketch(Plane(origin=(0, 27.3, 0), x_dir=(1, 0, 0), z_dir=(0, 1, 0))):
        with Locations((1.5, -18.5)):
            Circle(SKETCH_25_R)
    extrude(amount=EXTRUDE_12_PROFILE_4_DEPTH)
    # 凸台-拉伸12 profile 4: the draft: its side faces are tilted about the plane it starts from
    extrude_12_profile_4_sides = [extrude_12_profile_4_tool.faces().sort_by_distance(p)[0] for p in [
        (0, 27.8, 18.5),
    ]]
    draft(extrude_12_profile_4_sides, Plane(origin=(0, 27.3, 0), x_dir=(1, 0, 0), z_dir=(0, 1, 0)), EXTRUDE_12_PROFILE_4_DRAFT)


with BuildPart() as part_4:
    add(part_3.part)

    # 凸台-拉伸12 profile 4: add extrude_12_profile_4_tool
    add(extrude_12_profile_4_tool.part)

    # 草图29 → 凸台-拉伸15 (add)
    with BuildSketch(Plane.XZ.offset(9)):
        with Locations(Location((10, 10, 0), (0, 0, 270))):
            Circle(SKETCH_29_R)
    extrude(amount=EXTRUDE_15_DEPTH)

    # 草图30 → 凸台-拉伸16 (add)
    with BuildSketch(Plane.XZ.offset(10.2)):
        with Locations(Location((10, 10, 0), (0, 0, 270))):
            Circle(SKETCH_30_R)
    extrude(amount=EXTRUDE_16_DEPTH)

    # 草图31 → 凸台-拉伸17 (add)
    with BuildSketch(Plane.XZ.offset(10.5)):
        Polygon((12.976344104, 10.375999701), (12.421457903, 10.621724718), (12.789329458, 11.104373658), (12.1907667, 11.204384185), (12.427050983, 11.763355757), (11.822421569, 11.711367765), (11.912271969, 12.311539728), (11.339566987, 12.110819814), (11.277337875, 12.714481157), (10.772542486, 12.377641291), (10.562143944, 12.946861752), (10.156976299, 12.495066821), (9.811628441, 12.994080185), (9.531546714, 12.455718127), (9.072949017, 12.853169549), (8.935551771, 12.262067631), (8.392519615, 12.532983777), (8.406440026, 11.926283107), (7.813094118, 12.053641318), (7.977457514, 11.469463131), (7.37107996, 11.445261022), (7.675558785, 10.920311382), (7.094250517, 10.746069661), (7.519713247, 10.313333084), (7, 10), (7.519713247, 9.686666916), (7.094250517, 9.253930339), (7.675558785, 9.079688618), (7.37107996, 8.554738978), (7.977457514, 8.530536869), (7.813094118, 7.946358682), (8.406440026, 8.073716893), (8.392519615, 7.467016223), (8.935551771, 7.737932369), (9.072949017, 7.146830451), (9.531546714, 7.544281873), (9.811628441, 7.005919815), (10.156976299, 7.504933179), (10.562143944, 7.053138248), (10.772542486, 7.622358709), (11.277337875, 7.285518843), (11.339566987, 7.889180186), (11.912271969, 7.688460272), (11.822421569, 8.288632235), (12.427050983, 8.236644243), (12.1907667, 8.795615815), (12.789329458, 8.895626342), (12.421457903, 9.378275282), (12.976344104, 9.624000299), (12.5, 10), align=None)
    extrude(amount=EXTRUDE_17_DEPTH)

    # 草图33 → 切除-拉伸12 (cut)
    with BuildSketch(Plane.XZ.offset(10.5)):
        with Locations(Location((10, 10, 0), (0, 0, 90))):
            Circle(SKETCH_33_R)
    extrude(amount=CUT_EXTRUDE_12_DEPTH, mode=Mode.SUBTRACT)

    # 圆角1
    fillet_1_edges = [part_4.edges().sort_by_distance(p)[0] for p in [
        (-6.5, -1, 1),
        (46.5, -1, 19),
        (-6.5, -1, 19),
        (46.5, -1, 1),
    ]]
    fillet(fillet_1_edges, radius=FILLET_1_R)

    # 圆角2
    fillet_2_edges = [part_4.edges().sort_by_distance(p)[0] for p in [
        (40, 9.5, 0),
        (0, 9.5, 0),
        (0, 9.5, 20),
        (40, 9.5, 20),
    ]]
    fillet(fillet_2_edges, radius=FILLET_2_R - 0.0001)  # a hair under: the kernel refuses the full size

    # 圆角4
    fillet_4_edges = [part_4.edges().sort_by_distance(p)[0] for p in [
        (0.267949192, 28.3, 1.5),
        (37.267949192, 28.3, 1.5),
        (37.267949192, 28.3, 18.5),
        (0.267949192, 28.3, 18.5),
    ]]
    fillet(fillet_4_edges, radius=FILLET_4_R)

    # 草图34 → 凸台-拉伸18 (add)
    with BuildSketch(Plane.ZY):
        with Locations((10, 21.5)):
            Rectangle(SKETCH_34_W, SKETCH_34_H)
    extrude(amount=EXTRUDE_18_DEPTH)

    # 草图35 → 凸台-拉伸19 (add)
    with BuildSketch(Plane.ZY.offset(1)):
        with BuildLine():
            ThreePointArc((8.5, 23.5), (6.5, 21.5), (8.5, 19.5))
            Line((8.5, 19.5), (11.5, 19.5))
            ThreePointArc((11.5, 19.5), (13.5, 21.5), (11.5, 23.5))
            Line((11.5, 23.5), (8.5, 23.5))
        make_face()
    extrude(amount=EXTRUDE_19_DEPTH, taper=EXTRUDE_19_TAPER)


solid = part_4.part
